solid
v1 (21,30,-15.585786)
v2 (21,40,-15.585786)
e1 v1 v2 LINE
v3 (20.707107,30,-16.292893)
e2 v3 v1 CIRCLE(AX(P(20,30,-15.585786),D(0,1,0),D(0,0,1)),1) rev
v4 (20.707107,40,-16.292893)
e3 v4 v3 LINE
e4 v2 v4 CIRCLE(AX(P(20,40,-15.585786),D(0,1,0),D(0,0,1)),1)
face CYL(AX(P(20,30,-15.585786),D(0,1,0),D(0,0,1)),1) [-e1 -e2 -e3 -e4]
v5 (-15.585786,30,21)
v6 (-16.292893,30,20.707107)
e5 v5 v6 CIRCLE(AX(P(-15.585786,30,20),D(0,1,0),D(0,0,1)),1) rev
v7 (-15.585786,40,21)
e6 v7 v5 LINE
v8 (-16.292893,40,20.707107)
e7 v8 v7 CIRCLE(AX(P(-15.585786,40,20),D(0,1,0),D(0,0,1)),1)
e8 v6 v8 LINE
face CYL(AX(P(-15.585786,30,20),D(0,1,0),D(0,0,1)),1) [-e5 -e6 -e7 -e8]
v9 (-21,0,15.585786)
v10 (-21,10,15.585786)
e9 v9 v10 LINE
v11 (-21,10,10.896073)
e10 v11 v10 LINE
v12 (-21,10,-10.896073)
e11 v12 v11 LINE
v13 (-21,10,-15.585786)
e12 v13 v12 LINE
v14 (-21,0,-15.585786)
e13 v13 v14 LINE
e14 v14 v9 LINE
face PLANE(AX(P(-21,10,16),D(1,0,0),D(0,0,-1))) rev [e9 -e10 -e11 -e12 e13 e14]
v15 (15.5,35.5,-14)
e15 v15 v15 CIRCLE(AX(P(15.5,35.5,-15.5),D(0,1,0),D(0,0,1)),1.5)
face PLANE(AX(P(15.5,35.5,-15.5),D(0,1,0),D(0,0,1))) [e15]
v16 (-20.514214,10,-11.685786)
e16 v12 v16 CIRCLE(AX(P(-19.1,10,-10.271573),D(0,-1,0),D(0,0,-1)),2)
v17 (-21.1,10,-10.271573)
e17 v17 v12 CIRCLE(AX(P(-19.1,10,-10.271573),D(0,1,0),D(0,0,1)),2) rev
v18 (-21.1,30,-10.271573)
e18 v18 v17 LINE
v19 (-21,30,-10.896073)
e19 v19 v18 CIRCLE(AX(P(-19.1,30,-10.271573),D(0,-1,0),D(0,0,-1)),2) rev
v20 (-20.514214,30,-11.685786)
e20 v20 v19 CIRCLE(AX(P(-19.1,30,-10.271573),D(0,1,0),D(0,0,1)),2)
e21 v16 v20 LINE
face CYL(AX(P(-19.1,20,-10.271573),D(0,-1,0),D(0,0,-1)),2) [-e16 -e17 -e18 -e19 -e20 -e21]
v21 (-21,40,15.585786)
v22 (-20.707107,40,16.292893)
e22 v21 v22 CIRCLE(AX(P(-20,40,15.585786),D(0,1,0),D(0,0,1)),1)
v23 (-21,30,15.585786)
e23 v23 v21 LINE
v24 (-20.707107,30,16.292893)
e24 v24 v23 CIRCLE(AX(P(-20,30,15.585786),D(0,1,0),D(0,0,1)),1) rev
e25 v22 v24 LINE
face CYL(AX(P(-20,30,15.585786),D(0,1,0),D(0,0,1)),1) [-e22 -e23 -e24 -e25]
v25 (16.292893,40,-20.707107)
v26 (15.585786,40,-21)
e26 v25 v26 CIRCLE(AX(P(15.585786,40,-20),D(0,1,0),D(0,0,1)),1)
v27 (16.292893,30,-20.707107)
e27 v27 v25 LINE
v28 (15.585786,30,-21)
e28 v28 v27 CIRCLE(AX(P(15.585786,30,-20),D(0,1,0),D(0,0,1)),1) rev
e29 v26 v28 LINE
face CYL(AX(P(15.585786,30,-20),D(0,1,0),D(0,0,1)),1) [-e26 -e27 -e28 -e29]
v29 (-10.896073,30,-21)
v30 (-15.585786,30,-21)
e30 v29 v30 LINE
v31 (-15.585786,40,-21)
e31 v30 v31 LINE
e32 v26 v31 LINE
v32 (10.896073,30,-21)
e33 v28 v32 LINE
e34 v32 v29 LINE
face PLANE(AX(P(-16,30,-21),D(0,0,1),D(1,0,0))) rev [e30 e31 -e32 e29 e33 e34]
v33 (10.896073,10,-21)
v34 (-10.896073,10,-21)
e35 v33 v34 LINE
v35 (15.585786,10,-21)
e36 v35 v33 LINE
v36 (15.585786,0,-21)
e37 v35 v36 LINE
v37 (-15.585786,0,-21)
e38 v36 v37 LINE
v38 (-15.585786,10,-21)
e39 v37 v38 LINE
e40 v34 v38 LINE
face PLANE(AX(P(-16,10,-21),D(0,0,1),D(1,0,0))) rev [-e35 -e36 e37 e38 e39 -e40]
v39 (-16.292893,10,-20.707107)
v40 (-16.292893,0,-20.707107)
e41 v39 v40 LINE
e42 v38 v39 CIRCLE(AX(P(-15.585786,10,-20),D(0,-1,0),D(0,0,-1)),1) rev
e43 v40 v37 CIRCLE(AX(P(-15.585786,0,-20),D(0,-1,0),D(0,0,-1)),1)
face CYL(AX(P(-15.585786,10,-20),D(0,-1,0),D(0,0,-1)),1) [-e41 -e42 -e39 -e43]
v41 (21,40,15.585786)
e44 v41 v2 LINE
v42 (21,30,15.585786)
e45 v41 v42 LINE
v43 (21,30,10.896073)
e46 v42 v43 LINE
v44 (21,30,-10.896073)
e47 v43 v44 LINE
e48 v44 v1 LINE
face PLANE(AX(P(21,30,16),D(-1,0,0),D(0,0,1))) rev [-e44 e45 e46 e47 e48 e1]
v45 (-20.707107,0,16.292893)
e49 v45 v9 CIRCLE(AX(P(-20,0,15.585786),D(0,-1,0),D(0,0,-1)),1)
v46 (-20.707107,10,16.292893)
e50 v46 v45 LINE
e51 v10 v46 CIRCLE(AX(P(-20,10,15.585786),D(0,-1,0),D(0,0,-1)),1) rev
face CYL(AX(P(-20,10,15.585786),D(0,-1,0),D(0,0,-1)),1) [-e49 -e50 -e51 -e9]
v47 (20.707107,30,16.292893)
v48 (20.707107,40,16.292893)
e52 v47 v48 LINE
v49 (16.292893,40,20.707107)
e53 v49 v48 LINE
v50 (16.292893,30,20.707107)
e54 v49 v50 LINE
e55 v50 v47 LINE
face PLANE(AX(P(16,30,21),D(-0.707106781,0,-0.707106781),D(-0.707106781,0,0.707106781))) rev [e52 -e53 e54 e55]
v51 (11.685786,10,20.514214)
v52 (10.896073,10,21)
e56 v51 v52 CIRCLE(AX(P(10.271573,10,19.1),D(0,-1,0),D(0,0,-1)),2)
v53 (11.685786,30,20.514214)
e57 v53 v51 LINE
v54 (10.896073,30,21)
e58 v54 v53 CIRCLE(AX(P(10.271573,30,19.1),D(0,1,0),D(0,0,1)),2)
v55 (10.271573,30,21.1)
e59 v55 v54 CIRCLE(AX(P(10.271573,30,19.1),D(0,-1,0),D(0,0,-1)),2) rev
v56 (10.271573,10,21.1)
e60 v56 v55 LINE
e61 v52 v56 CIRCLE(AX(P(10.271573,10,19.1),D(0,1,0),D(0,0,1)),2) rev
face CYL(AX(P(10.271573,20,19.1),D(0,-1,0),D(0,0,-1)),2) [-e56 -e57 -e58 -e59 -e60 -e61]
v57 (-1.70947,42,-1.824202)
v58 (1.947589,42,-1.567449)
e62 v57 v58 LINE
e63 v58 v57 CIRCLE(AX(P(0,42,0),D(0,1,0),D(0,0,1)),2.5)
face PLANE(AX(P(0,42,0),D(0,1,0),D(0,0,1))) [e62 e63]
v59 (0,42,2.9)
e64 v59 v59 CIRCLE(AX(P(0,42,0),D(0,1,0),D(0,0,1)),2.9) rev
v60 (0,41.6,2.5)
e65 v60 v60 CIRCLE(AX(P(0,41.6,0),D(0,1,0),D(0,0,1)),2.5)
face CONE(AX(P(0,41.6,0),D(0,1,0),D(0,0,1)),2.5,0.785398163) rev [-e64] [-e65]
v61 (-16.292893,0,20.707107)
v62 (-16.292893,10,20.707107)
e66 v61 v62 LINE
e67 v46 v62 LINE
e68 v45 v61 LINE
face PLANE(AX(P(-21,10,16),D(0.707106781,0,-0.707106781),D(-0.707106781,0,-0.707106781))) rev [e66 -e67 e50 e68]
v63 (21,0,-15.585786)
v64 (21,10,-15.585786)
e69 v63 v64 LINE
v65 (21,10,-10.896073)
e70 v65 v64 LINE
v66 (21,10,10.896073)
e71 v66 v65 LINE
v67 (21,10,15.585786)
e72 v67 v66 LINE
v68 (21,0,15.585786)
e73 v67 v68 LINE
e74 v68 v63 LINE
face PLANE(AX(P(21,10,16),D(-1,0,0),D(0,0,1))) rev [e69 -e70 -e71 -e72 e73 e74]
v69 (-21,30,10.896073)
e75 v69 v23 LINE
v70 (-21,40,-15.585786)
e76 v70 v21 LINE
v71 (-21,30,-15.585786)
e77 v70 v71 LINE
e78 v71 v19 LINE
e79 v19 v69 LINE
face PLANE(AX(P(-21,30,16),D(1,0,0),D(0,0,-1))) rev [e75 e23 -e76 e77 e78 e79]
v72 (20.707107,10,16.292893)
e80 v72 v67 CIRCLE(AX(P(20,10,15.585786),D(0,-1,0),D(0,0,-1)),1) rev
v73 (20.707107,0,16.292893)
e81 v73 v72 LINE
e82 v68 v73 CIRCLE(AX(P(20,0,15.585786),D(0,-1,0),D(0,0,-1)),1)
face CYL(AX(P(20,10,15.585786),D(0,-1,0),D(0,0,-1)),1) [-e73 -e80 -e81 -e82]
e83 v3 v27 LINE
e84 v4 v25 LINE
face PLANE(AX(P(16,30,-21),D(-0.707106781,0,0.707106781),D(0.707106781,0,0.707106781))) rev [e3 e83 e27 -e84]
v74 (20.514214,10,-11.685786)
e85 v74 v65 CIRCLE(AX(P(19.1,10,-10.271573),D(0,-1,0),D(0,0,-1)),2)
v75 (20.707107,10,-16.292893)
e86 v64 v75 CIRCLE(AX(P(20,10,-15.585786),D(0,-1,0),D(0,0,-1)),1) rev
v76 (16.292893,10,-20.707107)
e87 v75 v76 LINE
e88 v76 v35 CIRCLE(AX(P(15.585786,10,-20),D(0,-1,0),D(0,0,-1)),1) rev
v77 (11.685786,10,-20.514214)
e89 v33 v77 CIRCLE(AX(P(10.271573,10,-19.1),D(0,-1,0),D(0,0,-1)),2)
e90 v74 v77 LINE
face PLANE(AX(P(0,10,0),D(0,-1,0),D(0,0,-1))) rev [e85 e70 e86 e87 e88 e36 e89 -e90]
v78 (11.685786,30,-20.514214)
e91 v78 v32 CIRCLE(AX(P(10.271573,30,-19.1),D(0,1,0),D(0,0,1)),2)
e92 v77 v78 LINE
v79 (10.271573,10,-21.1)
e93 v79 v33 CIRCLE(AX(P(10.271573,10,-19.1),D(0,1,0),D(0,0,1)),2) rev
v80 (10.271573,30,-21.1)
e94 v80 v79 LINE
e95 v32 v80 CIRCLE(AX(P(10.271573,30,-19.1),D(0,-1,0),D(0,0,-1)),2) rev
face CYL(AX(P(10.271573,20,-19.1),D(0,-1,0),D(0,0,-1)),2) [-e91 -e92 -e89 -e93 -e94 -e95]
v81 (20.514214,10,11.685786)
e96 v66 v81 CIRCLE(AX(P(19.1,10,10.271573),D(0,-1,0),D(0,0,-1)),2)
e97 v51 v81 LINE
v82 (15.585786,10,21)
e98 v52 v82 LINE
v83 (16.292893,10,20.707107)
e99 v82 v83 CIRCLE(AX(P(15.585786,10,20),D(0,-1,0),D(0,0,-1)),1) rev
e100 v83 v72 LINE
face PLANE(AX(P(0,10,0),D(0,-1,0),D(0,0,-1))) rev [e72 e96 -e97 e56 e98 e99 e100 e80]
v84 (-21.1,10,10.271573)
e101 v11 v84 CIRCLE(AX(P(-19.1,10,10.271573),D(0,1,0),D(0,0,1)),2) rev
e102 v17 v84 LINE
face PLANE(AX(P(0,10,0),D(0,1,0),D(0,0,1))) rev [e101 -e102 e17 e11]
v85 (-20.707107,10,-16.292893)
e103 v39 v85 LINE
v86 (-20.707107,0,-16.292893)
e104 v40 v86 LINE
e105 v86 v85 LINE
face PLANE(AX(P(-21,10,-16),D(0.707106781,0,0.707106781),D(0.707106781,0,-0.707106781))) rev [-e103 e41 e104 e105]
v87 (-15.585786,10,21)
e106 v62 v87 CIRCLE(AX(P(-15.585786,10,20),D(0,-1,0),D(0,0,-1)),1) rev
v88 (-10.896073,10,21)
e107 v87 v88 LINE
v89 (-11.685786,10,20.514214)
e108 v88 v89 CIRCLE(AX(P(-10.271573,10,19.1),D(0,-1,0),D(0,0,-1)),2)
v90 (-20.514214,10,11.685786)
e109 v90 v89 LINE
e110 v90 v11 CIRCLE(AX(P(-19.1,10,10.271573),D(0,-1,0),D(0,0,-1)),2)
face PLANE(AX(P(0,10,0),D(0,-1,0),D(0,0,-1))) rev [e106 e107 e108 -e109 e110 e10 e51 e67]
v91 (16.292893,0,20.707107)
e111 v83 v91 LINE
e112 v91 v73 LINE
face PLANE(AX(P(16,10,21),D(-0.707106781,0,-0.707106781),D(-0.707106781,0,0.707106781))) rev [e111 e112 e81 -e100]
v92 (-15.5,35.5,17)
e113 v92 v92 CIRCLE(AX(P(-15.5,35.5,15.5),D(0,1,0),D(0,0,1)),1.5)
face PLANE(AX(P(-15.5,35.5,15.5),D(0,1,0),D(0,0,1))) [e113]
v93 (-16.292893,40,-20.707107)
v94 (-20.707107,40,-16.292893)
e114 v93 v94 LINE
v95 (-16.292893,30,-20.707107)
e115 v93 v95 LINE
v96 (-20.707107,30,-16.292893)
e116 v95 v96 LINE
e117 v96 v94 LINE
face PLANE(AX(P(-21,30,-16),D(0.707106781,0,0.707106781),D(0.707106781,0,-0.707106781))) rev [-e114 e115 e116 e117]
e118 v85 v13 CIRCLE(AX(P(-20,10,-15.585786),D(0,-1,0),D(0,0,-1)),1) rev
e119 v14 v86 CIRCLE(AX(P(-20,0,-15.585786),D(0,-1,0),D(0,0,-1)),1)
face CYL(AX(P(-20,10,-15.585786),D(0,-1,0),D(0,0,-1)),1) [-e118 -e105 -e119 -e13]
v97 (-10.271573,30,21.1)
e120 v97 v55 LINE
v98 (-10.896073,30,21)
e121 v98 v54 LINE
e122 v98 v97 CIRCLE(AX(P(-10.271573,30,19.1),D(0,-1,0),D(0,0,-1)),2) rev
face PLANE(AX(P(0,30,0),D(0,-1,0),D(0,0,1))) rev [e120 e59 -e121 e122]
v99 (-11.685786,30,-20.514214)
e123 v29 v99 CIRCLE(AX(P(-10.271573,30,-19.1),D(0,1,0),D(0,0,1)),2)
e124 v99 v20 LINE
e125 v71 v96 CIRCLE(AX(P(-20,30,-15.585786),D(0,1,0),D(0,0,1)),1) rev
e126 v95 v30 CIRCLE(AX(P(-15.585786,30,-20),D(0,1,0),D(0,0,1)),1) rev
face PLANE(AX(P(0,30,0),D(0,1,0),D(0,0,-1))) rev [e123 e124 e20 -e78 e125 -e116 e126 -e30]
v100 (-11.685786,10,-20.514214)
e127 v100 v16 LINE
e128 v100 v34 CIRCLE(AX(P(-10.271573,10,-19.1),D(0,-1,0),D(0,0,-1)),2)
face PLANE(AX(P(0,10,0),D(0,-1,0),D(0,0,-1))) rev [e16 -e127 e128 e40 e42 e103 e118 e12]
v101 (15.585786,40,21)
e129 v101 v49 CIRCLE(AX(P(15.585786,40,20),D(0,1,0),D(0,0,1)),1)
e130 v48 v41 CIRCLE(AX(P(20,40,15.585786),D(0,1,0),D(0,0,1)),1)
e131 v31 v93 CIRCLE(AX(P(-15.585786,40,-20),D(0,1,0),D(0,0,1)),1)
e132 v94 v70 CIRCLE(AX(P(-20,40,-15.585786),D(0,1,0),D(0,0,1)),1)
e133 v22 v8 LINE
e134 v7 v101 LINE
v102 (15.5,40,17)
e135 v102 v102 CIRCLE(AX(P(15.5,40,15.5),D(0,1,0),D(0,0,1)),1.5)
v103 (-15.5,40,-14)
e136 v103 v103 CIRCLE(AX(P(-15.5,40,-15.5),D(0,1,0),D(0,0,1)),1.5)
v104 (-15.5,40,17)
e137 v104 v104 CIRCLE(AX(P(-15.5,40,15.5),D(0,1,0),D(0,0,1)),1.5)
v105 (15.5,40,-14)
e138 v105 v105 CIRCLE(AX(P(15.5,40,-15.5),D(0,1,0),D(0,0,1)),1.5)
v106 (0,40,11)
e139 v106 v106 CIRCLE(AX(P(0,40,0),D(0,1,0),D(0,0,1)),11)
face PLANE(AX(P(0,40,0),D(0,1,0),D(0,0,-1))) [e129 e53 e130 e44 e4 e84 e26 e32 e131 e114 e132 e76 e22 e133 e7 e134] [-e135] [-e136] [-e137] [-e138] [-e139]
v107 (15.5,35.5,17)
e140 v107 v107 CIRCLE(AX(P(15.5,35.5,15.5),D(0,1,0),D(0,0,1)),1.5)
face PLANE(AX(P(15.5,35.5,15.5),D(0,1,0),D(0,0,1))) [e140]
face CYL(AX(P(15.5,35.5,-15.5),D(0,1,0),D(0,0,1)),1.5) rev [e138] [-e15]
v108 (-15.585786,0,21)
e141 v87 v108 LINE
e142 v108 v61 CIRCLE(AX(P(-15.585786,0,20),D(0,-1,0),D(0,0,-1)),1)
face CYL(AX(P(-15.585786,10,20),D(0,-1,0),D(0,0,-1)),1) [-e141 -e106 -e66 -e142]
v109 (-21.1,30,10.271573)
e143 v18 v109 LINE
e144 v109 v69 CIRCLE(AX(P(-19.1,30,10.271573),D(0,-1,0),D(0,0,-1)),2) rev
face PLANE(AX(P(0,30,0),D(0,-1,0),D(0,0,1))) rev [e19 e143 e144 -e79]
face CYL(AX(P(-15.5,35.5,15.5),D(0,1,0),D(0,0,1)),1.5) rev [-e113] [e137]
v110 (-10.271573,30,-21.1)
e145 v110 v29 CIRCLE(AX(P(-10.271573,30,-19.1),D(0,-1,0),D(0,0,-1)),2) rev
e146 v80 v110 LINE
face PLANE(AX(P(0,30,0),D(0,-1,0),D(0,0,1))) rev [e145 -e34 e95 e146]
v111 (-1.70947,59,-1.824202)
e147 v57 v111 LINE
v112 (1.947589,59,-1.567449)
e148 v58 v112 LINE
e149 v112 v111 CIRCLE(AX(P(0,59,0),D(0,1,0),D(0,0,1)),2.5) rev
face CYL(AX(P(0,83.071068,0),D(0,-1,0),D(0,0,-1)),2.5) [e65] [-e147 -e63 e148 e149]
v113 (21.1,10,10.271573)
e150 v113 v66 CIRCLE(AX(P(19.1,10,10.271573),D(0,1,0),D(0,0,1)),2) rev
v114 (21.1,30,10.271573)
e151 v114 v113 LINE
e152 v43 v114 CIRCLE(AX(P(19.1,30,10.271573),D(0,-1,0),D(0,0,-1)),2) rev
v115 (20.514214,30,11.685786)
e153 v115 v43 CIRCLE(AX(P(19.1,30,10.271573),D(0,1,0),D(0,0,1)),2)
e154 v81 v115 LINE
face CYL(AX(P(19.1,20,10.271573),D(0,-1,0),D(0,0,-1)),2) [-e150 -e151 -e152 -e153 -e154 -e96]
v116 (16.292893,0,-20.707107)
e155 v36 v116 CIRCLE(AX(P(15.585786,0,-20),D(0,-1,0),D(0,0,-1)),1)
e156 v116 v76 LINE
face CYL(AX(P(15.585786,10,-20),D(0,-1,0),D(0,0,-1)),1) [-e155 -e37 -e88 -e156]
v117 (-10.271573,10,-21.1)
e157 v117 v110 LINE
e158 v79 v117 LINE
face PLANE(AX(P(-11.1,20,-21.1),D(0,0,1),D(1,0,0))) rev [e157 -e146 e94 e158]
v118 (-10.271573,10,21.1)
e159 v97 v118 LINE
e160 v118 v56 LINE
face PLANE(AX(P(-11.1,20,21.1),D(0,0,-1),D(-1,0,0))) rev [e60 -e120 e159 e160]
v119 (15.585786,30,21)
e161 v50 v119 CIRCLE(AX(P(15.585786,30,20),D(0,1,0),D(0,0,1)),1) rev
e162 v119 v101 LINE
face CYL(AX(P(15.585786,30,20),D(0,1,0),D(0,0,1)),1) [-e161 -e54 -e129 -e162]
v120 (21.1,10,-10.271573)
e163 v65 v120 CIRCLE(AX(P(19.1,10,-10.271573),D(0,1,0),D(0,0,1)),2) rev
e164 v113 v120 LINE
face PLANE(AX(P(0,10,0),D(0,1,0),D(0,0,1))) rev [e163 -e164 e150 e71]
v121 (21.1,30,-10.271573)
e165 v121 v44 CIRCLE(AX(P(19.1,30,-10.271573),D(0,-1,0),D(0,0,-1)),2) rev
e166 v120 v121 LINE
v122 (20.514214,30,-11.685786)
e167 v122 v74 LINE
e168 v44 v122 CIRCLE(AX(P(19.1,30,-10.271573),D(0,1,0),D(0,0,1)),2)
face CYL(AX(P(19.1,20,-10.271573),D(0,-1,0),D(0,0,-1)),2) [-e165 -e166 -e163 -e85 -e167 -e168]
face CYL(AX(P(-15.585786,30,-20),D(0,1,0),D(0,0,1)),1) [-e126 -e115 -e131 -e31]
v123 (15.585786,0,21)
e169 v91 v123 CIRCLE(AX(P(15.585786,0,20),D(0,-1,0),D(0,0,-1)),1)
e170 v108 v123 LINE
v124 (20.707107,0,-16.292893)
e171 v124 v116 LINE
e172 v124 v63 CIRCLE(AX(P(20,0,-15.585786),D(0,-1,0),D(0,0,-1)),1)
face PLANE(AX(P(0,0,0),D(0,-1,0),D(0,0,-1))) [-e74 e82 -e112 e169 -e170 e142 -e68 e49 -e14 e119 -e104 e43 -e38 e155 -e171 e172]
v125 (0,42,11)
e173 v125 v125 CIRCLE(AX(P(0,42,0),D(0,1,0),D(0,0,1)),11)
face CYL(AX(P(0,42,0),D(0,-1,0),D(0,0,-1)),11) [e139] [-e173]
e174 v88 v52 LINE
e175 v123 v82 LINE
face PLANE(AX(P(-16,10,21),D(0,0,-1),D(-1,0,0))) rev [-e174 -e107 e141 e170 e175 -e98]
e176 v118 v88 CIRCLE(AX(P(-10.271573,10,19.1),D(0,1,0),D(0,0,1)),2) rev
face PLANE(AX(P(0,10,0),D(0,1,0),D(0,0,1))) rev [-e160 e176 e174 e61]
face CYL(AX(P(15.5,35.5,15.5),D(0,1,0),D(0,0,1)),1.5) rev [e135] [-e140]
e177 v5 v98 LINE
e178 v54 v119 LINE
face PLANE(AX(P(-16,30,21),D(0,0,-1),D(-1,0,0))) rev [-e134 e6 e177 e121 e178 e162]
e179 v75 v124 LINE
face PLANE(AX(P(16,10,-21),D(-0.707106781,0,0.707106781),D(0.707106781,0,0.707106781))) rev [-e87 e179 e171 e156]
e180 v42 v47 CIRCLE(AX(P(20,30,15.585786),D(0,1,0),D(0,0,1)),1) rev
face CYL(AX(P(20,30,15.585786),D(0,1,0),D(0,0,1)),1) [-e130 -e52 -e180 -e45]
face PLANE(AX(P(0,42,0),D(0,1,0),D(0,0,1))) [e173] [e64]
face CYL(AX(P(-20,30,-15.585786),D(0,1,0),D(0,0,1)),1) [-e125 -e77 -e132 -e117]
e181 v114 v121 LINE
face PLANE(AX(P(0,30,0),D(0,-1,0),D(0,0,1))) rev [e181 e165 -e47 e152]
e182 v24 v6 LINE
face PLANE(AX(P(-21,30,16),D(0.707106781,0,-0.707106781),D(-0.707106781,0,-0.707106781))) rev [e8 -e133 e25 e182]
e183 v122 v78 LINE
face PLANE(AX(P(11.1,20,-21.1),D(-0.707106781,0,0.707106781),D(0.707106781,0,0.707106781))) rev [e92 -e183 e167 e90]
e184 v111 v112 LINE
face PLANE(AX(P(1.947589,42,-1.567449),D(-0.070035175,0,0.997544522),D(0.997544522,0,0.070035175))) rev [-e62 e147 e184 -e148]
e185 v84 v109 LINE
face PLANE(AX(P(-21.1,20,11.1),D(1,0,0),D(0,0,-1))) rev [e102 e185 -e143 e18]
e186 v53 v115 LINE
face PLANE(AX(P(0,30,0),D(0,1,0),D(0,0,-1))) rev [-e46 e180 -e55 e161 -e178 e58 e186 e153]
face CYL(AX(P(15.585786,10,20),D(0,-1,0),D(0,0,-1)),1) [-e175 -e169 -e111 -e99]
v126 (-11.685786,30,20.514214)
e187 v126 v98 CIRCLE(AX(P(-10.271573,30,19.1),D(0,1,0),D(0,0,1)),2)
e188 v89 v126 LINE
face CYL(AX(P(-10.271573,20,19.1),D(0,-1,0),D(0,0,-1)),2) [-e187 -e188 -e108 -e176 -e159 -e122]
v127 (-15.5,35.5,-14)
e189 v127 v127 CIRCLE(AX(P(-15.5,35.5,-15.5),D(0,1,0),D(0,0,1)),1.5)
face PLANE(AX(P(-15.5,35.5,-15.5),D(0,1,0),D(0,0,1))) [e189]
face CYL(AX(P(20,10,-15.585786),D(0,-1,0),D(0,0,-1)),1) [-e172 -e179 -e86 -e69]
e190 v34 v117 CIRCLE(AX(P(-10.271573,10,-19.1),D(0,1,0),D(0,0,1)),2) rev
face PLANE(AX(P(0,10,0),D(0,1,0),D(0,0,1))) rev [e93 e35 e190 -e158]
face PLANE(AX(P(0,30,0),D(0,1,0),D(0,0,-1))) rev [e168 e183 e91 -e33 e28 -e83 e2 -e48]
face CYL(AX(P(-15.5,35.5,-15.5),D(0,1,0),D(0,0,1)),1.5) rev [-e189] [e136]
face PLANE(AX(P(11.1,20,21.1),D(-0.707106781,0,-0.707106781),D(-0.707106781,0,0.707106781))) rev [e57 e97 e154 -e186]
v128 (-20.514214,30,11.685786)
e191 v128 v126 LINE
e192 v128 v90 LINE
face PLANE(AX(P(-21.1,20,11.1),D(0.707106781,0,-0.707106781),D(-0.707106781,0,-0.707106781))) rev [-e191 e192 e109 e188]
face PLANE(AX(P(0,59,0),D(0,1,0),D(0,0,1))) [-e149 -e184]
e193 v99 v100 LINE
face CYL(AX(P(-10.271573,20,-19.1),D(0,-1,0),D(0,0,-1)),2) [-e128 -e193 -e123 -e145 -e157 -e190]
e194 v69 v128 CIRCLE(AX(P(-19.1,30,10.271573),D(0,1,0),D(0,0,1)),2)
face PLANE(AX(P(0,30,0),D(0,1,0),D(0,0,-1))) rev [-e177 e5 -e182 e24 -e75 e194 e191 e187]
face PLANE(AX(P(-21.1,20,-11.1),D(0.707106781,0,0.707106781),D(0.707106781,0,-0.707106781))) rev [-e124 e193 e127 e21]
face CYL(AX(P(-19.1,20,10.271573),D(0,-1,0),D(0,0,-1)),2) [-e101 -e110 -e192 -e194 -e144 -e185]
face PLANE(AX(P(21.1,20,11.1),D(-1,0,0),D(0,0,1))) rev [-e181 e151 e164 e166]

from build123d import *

# Parameters (mm, degrees)
BOSS_EXTRUDE1_DEPTH = 10
BOSS_EXTRUDE2_DEPTH = 10
MIRROR1_START       = 20
MIRROR1_DEPTH       = 20
MIRROR1_START_2     = 30
MIRROR1_2_DEPTH     = 10
MIRROR1_3_DEPTH     = 10
FILLET1_R           = 2
FILLET2_R           = 1
SKETCH3_R           = 11
BOSS_EXTRUDE3_DEPTH = 2
SKETCH4_R           = 1.5
CUT_EXTRUDE1_DEPTH  = 4.5
SKETCH5_R           = 2.5
CUT_EXTRUDE3_DEPTH  = 52.521063654
CHAMFER3_SIZE       = 0.4
BOSS_EXTRUDE4_START = -59
SKETCH6_R           = 2.5
BOSS_EXTRUDE4_DEPTH = 59
CUT_EXTRUDE8_DEPTH  = 17


# Read off the part's stored shape, not the designer's step: Mirror1
with BuildPart() as part:
    # Sketch1 → Boss-Extrude1 (new body)
    with BuildSketch(Plane(origin=(0, 0, 0), x_dir=(1, 0, 0), z_dir=(0, 1, 0))):
        Polygon((-21, 16), (-16, 21), (16, 21), (21, 16), (21, -16), (16, -21), (-16, -21), (-21, -16), align=None)
    extrude(amount=BOSS_EXTRUDE1_DEPTH)

    # Sketch2 → Boss-Extrude2 (add)
    with BuildSketch(Plane(origin=(0, 10, 0), x_dir=(1, 0, 0), z_dir=(0, 1, 0))):
        Polygon((-21.1, 11.1), (-11.1, 21.1), (11.1, 21.1), (21.1, 11.1), (21.1, -11.1), (11.1, -21.1), (-11.1, -21.1), (-21.1, -11.1), align=None)
    extrude(amount=BOSS_EXTRUDE2_DEPTH)

    # Mirror1 outline → Mirror1 (add)
    with BuildSketch(Plane(origin=(0, 0, 0), x_dir=(1, 0, 0), z_dir=(0, 1, 0)).offset(MIRROR1_START)):
        Polygon((-21, 11.2), (-21, -11.2), (-11.2, -21), (11.2, -21), (21, -11.2), (21, 11.2), (11.2, 21), (-11.2, 21), align=None)
    extrude(amount=MIRROR1_DEPTH)

    # Mirror1 2 outline → Mirror1 2 (add)
    with BuildSketch(Plane(origin=(0, 0, 0), x_dir=(1, 0, 0), z_dir=(0, 1, 0)).offset(MIRROR1_START_2)):
        Polygon((-21, -11.2), (-21, -16), (-16, -21), (-11.2, -21), align=None)
        Polygon((-21, 16), (-21, 11.2), (-11.2, 21), (-16, 21), align=None)
        Polygon((21, -11.2), (11.2, -21), (16, -21), (21, -16), align=None)
        Polygon((16, 21), (11.2, 21), (21, 11.2), (21, 16), align=None)
    extrude(amount=MIRROR1_2_DEPTH)

    # Mirror1 3 outline → Mirror1 3 (add)
    with BuildSketch(Plane(origin=(0, 0, 0), x_dir=(1, 0, 0), z_dir=(0, 1, 0)).offset(MIRROR1_START)):
        Polygon((-21.1, -11.1), (-21, -11.2), (-21, 11.2), (-21.1, 11.1), align=None)
        Polygon((11.2, -21), (-11.2, -21), (-11.1, -21.1), (11.1, -21.1), align=None)
        Polygon((-11.1, 21.1), (-11.2, 21), (11.2, 21), (11.1, 21.1), align=None)
        Polygon((21, 11.2), (21, -11.2), (21.1, -11.1), (21.1, 11.1), align=None)
    extrude(amount=MIRROR1_3_DEPTH)

    # Fillet1
    # the kernel refuses this fillet: 2 mm, written as the material it takes off along each edge
    with BuildSketch(Plane(origin=(11.1, 10, -21.1), x_dir=(0.7071067811865497, 0, 0.7071067811865454), z_dir=(0, 1, 0)), Plane(origin=(-11.1, 30, -21.1), x_dir=(-0.707106781186553, 0, 0.7071067811865422), z_dir=(0, -1, 0)), Plane(origin=(-21.1, 10, -11.1), x_dir=(0.7071067811865487, 0, -0.7071067811865465), z_dir=(0, 1, 0)), Plane(origin=(-21.1, 30, 11.1), x_dir=(0.7071067811865239, 1.1932702685997172e-15, 0.7071067811865711), z_dir=(0, -1, 0)), Plane(origin=(-11.1, 10, 21.1), x_dir=(-0.7071067811865497, 0, -0.7071067811865454), z_dir=(0, 1, 0)), Plane(origin=(21.1, 30, -11.1), x_dir=(-0.7071067811865326, 1.3816813636417406e-15, -0.7071067811865626), z_dir=(0, -1, 0))) as fillet1_piece_1:
        with BuildLine():
            CenterArc((FILLET1_R * 0.414213562373, -FILLET1_R), FILLET1_R, 90, 45)
            Line((-FILLET1_R * 0.292893218813, -FILLET1_R * 0.292893218813), (0, 0))
            Line((0, 0), (FILLET1_R * 0.414213562373, 0))
        make_face()
    extrude(amount=20, mode=Mode.SUBTRACT)
    with BuildSketch(Plane(origin=(11.1, 10, 21.1), x_dir=(0.7071067811865465, 0, -0.7071067811865487), z_dir=(0, 1, 0)), Plane(origin=(21.1, 30, 11.1), x_dir=(-0.7071067811865475, 0, 0.7071067811865475), z_dir=(0, -1, 0))) as fillet1_piece_2:
        with BuildLine():
            CenterArc((FILLET1_R * 0.414213562373, FILLET1_R), FILLET1_R, 225, 45)
            Line((-FILLET1_R * 0.292893218813, FILLET1_R * 0.292893218813), (0, 0))
            Line((0, 0), (FILLET1_R * 0.414213562373, 0))
        make_face()
    extrude(amount=20, mode=Mode.SUBTRACT)

    # Fillet2
    fillet2_edges = [part.edges().sort_by_distance(p)[0] for p in [
        (-21, 5, -16),
        (-16, 5, -21),
        (16, 5, -21),
        (21, 5, -16),
        (21, 5, 16),
        (16, 5, 21),
        (-16, 5, 21),
        (-21, 5, 16),
        (-21, 35, 16),
        (-16, 35, 21),
        (16, 35, 21),
        (21, 35, 16),
        (21, 35, -16),
        (16, 35, -21),
        (-16, 35, -21),
        (-21, 35, -16),
    ]]
    fillet(fillet2_edges, radius=FILLET2_R)

    # Sketch3 → Boss-Extrude3 (add)
    with BuildSketch(Plane(origin=(0, 40, 0), x_dir=(1, 0, 0), z_dir=(0, 1, 0))):
        with Locations(Location((0, 0, 0), (0, 0, 270))):
            Circle(SKETCH3_R)
    extrude(amount=BOSS_EXTRUDE3_DEPTH)

    # Sketch4 → Cut-Extrude1 (cut)
    with BuildSketch(Plane(origin=(0, 40, 0), x_dir=(1, 0, 0), z_dir=(0, 1, 0))):
        with Locations(Location((-15.5, 15.5, 0), (0, 0, 270))):
            Circle(SKETCH4_R)
        with Locations(Location((15.5, 15.5, 0), (0, 0, 270))):
            Circle(SKETCH4_R)
        with Locations(Location((15.5, -15.5, 0), (0, 0, 270))):
            Circle(SKETCH4_R)
        with Locations(Location((-15.5, -15.5, 0), (0, 0, 270))):
            Circle(SKETCH4_R)
    extrude(amount=-CUT_EXTRUDE1_DEPTH, mode=Mode.SUBTRACT)

    # Sketch5 → Cut-Extrude3 (cut, through all)
    with BuildSketch(Plane(origin=(0, 42, 0), x_dir=(1, 0, 0), z_dir=(0, 1, 0))):
        with Locations(Location((0, 0, 0), (0, 0, 270))):
            Circle(SKETCH5_R)
    extrude(amount=-CUT_EXTRUDE3_DEPTH, mode=Mode.SUBTRACT)

    # Chamfer3
    chamfer3_edges = [part.edges().sort_by_distance(p)[0] for p in [
        (0, 42, -2.5),
    ]]
    chamfer(chamfer3_edges, length=CHAMFER3_SIZE)

    # Sketch6 → Boss-Extrude4 (add)
    with BuildSketch(Plane.XZ.offset(BOSS_EXTRUDE4_START)):
        with Locations(Location((0, 0, 0), (0, 0, 90))):
            Circle(SKETCH6_R)
    extrude(amount=BOSS_EXTRUDE4_DEPTH)

    # Sketch7 → Cut-Extrude8 (cut)
    with BuildSketch(Plane(origin=(0, 59, 0), x_dir=(1, 0, 0), z_dir=(0, 1, 0))):
        with BuildLine():
            Line((1.947589111, 1.567449092), (-1.709469516, 1.824202284))
            ThreePointArc((-1.709469516, 1.824202284), (0.175087938, 2.493861306), (1.947589111, 1.567449092))
        make_face()
    extrude(amount=-CUT_EXTRUDE8_DEPTH, mode=Mode.SUBTRACT)


solid = part.part
